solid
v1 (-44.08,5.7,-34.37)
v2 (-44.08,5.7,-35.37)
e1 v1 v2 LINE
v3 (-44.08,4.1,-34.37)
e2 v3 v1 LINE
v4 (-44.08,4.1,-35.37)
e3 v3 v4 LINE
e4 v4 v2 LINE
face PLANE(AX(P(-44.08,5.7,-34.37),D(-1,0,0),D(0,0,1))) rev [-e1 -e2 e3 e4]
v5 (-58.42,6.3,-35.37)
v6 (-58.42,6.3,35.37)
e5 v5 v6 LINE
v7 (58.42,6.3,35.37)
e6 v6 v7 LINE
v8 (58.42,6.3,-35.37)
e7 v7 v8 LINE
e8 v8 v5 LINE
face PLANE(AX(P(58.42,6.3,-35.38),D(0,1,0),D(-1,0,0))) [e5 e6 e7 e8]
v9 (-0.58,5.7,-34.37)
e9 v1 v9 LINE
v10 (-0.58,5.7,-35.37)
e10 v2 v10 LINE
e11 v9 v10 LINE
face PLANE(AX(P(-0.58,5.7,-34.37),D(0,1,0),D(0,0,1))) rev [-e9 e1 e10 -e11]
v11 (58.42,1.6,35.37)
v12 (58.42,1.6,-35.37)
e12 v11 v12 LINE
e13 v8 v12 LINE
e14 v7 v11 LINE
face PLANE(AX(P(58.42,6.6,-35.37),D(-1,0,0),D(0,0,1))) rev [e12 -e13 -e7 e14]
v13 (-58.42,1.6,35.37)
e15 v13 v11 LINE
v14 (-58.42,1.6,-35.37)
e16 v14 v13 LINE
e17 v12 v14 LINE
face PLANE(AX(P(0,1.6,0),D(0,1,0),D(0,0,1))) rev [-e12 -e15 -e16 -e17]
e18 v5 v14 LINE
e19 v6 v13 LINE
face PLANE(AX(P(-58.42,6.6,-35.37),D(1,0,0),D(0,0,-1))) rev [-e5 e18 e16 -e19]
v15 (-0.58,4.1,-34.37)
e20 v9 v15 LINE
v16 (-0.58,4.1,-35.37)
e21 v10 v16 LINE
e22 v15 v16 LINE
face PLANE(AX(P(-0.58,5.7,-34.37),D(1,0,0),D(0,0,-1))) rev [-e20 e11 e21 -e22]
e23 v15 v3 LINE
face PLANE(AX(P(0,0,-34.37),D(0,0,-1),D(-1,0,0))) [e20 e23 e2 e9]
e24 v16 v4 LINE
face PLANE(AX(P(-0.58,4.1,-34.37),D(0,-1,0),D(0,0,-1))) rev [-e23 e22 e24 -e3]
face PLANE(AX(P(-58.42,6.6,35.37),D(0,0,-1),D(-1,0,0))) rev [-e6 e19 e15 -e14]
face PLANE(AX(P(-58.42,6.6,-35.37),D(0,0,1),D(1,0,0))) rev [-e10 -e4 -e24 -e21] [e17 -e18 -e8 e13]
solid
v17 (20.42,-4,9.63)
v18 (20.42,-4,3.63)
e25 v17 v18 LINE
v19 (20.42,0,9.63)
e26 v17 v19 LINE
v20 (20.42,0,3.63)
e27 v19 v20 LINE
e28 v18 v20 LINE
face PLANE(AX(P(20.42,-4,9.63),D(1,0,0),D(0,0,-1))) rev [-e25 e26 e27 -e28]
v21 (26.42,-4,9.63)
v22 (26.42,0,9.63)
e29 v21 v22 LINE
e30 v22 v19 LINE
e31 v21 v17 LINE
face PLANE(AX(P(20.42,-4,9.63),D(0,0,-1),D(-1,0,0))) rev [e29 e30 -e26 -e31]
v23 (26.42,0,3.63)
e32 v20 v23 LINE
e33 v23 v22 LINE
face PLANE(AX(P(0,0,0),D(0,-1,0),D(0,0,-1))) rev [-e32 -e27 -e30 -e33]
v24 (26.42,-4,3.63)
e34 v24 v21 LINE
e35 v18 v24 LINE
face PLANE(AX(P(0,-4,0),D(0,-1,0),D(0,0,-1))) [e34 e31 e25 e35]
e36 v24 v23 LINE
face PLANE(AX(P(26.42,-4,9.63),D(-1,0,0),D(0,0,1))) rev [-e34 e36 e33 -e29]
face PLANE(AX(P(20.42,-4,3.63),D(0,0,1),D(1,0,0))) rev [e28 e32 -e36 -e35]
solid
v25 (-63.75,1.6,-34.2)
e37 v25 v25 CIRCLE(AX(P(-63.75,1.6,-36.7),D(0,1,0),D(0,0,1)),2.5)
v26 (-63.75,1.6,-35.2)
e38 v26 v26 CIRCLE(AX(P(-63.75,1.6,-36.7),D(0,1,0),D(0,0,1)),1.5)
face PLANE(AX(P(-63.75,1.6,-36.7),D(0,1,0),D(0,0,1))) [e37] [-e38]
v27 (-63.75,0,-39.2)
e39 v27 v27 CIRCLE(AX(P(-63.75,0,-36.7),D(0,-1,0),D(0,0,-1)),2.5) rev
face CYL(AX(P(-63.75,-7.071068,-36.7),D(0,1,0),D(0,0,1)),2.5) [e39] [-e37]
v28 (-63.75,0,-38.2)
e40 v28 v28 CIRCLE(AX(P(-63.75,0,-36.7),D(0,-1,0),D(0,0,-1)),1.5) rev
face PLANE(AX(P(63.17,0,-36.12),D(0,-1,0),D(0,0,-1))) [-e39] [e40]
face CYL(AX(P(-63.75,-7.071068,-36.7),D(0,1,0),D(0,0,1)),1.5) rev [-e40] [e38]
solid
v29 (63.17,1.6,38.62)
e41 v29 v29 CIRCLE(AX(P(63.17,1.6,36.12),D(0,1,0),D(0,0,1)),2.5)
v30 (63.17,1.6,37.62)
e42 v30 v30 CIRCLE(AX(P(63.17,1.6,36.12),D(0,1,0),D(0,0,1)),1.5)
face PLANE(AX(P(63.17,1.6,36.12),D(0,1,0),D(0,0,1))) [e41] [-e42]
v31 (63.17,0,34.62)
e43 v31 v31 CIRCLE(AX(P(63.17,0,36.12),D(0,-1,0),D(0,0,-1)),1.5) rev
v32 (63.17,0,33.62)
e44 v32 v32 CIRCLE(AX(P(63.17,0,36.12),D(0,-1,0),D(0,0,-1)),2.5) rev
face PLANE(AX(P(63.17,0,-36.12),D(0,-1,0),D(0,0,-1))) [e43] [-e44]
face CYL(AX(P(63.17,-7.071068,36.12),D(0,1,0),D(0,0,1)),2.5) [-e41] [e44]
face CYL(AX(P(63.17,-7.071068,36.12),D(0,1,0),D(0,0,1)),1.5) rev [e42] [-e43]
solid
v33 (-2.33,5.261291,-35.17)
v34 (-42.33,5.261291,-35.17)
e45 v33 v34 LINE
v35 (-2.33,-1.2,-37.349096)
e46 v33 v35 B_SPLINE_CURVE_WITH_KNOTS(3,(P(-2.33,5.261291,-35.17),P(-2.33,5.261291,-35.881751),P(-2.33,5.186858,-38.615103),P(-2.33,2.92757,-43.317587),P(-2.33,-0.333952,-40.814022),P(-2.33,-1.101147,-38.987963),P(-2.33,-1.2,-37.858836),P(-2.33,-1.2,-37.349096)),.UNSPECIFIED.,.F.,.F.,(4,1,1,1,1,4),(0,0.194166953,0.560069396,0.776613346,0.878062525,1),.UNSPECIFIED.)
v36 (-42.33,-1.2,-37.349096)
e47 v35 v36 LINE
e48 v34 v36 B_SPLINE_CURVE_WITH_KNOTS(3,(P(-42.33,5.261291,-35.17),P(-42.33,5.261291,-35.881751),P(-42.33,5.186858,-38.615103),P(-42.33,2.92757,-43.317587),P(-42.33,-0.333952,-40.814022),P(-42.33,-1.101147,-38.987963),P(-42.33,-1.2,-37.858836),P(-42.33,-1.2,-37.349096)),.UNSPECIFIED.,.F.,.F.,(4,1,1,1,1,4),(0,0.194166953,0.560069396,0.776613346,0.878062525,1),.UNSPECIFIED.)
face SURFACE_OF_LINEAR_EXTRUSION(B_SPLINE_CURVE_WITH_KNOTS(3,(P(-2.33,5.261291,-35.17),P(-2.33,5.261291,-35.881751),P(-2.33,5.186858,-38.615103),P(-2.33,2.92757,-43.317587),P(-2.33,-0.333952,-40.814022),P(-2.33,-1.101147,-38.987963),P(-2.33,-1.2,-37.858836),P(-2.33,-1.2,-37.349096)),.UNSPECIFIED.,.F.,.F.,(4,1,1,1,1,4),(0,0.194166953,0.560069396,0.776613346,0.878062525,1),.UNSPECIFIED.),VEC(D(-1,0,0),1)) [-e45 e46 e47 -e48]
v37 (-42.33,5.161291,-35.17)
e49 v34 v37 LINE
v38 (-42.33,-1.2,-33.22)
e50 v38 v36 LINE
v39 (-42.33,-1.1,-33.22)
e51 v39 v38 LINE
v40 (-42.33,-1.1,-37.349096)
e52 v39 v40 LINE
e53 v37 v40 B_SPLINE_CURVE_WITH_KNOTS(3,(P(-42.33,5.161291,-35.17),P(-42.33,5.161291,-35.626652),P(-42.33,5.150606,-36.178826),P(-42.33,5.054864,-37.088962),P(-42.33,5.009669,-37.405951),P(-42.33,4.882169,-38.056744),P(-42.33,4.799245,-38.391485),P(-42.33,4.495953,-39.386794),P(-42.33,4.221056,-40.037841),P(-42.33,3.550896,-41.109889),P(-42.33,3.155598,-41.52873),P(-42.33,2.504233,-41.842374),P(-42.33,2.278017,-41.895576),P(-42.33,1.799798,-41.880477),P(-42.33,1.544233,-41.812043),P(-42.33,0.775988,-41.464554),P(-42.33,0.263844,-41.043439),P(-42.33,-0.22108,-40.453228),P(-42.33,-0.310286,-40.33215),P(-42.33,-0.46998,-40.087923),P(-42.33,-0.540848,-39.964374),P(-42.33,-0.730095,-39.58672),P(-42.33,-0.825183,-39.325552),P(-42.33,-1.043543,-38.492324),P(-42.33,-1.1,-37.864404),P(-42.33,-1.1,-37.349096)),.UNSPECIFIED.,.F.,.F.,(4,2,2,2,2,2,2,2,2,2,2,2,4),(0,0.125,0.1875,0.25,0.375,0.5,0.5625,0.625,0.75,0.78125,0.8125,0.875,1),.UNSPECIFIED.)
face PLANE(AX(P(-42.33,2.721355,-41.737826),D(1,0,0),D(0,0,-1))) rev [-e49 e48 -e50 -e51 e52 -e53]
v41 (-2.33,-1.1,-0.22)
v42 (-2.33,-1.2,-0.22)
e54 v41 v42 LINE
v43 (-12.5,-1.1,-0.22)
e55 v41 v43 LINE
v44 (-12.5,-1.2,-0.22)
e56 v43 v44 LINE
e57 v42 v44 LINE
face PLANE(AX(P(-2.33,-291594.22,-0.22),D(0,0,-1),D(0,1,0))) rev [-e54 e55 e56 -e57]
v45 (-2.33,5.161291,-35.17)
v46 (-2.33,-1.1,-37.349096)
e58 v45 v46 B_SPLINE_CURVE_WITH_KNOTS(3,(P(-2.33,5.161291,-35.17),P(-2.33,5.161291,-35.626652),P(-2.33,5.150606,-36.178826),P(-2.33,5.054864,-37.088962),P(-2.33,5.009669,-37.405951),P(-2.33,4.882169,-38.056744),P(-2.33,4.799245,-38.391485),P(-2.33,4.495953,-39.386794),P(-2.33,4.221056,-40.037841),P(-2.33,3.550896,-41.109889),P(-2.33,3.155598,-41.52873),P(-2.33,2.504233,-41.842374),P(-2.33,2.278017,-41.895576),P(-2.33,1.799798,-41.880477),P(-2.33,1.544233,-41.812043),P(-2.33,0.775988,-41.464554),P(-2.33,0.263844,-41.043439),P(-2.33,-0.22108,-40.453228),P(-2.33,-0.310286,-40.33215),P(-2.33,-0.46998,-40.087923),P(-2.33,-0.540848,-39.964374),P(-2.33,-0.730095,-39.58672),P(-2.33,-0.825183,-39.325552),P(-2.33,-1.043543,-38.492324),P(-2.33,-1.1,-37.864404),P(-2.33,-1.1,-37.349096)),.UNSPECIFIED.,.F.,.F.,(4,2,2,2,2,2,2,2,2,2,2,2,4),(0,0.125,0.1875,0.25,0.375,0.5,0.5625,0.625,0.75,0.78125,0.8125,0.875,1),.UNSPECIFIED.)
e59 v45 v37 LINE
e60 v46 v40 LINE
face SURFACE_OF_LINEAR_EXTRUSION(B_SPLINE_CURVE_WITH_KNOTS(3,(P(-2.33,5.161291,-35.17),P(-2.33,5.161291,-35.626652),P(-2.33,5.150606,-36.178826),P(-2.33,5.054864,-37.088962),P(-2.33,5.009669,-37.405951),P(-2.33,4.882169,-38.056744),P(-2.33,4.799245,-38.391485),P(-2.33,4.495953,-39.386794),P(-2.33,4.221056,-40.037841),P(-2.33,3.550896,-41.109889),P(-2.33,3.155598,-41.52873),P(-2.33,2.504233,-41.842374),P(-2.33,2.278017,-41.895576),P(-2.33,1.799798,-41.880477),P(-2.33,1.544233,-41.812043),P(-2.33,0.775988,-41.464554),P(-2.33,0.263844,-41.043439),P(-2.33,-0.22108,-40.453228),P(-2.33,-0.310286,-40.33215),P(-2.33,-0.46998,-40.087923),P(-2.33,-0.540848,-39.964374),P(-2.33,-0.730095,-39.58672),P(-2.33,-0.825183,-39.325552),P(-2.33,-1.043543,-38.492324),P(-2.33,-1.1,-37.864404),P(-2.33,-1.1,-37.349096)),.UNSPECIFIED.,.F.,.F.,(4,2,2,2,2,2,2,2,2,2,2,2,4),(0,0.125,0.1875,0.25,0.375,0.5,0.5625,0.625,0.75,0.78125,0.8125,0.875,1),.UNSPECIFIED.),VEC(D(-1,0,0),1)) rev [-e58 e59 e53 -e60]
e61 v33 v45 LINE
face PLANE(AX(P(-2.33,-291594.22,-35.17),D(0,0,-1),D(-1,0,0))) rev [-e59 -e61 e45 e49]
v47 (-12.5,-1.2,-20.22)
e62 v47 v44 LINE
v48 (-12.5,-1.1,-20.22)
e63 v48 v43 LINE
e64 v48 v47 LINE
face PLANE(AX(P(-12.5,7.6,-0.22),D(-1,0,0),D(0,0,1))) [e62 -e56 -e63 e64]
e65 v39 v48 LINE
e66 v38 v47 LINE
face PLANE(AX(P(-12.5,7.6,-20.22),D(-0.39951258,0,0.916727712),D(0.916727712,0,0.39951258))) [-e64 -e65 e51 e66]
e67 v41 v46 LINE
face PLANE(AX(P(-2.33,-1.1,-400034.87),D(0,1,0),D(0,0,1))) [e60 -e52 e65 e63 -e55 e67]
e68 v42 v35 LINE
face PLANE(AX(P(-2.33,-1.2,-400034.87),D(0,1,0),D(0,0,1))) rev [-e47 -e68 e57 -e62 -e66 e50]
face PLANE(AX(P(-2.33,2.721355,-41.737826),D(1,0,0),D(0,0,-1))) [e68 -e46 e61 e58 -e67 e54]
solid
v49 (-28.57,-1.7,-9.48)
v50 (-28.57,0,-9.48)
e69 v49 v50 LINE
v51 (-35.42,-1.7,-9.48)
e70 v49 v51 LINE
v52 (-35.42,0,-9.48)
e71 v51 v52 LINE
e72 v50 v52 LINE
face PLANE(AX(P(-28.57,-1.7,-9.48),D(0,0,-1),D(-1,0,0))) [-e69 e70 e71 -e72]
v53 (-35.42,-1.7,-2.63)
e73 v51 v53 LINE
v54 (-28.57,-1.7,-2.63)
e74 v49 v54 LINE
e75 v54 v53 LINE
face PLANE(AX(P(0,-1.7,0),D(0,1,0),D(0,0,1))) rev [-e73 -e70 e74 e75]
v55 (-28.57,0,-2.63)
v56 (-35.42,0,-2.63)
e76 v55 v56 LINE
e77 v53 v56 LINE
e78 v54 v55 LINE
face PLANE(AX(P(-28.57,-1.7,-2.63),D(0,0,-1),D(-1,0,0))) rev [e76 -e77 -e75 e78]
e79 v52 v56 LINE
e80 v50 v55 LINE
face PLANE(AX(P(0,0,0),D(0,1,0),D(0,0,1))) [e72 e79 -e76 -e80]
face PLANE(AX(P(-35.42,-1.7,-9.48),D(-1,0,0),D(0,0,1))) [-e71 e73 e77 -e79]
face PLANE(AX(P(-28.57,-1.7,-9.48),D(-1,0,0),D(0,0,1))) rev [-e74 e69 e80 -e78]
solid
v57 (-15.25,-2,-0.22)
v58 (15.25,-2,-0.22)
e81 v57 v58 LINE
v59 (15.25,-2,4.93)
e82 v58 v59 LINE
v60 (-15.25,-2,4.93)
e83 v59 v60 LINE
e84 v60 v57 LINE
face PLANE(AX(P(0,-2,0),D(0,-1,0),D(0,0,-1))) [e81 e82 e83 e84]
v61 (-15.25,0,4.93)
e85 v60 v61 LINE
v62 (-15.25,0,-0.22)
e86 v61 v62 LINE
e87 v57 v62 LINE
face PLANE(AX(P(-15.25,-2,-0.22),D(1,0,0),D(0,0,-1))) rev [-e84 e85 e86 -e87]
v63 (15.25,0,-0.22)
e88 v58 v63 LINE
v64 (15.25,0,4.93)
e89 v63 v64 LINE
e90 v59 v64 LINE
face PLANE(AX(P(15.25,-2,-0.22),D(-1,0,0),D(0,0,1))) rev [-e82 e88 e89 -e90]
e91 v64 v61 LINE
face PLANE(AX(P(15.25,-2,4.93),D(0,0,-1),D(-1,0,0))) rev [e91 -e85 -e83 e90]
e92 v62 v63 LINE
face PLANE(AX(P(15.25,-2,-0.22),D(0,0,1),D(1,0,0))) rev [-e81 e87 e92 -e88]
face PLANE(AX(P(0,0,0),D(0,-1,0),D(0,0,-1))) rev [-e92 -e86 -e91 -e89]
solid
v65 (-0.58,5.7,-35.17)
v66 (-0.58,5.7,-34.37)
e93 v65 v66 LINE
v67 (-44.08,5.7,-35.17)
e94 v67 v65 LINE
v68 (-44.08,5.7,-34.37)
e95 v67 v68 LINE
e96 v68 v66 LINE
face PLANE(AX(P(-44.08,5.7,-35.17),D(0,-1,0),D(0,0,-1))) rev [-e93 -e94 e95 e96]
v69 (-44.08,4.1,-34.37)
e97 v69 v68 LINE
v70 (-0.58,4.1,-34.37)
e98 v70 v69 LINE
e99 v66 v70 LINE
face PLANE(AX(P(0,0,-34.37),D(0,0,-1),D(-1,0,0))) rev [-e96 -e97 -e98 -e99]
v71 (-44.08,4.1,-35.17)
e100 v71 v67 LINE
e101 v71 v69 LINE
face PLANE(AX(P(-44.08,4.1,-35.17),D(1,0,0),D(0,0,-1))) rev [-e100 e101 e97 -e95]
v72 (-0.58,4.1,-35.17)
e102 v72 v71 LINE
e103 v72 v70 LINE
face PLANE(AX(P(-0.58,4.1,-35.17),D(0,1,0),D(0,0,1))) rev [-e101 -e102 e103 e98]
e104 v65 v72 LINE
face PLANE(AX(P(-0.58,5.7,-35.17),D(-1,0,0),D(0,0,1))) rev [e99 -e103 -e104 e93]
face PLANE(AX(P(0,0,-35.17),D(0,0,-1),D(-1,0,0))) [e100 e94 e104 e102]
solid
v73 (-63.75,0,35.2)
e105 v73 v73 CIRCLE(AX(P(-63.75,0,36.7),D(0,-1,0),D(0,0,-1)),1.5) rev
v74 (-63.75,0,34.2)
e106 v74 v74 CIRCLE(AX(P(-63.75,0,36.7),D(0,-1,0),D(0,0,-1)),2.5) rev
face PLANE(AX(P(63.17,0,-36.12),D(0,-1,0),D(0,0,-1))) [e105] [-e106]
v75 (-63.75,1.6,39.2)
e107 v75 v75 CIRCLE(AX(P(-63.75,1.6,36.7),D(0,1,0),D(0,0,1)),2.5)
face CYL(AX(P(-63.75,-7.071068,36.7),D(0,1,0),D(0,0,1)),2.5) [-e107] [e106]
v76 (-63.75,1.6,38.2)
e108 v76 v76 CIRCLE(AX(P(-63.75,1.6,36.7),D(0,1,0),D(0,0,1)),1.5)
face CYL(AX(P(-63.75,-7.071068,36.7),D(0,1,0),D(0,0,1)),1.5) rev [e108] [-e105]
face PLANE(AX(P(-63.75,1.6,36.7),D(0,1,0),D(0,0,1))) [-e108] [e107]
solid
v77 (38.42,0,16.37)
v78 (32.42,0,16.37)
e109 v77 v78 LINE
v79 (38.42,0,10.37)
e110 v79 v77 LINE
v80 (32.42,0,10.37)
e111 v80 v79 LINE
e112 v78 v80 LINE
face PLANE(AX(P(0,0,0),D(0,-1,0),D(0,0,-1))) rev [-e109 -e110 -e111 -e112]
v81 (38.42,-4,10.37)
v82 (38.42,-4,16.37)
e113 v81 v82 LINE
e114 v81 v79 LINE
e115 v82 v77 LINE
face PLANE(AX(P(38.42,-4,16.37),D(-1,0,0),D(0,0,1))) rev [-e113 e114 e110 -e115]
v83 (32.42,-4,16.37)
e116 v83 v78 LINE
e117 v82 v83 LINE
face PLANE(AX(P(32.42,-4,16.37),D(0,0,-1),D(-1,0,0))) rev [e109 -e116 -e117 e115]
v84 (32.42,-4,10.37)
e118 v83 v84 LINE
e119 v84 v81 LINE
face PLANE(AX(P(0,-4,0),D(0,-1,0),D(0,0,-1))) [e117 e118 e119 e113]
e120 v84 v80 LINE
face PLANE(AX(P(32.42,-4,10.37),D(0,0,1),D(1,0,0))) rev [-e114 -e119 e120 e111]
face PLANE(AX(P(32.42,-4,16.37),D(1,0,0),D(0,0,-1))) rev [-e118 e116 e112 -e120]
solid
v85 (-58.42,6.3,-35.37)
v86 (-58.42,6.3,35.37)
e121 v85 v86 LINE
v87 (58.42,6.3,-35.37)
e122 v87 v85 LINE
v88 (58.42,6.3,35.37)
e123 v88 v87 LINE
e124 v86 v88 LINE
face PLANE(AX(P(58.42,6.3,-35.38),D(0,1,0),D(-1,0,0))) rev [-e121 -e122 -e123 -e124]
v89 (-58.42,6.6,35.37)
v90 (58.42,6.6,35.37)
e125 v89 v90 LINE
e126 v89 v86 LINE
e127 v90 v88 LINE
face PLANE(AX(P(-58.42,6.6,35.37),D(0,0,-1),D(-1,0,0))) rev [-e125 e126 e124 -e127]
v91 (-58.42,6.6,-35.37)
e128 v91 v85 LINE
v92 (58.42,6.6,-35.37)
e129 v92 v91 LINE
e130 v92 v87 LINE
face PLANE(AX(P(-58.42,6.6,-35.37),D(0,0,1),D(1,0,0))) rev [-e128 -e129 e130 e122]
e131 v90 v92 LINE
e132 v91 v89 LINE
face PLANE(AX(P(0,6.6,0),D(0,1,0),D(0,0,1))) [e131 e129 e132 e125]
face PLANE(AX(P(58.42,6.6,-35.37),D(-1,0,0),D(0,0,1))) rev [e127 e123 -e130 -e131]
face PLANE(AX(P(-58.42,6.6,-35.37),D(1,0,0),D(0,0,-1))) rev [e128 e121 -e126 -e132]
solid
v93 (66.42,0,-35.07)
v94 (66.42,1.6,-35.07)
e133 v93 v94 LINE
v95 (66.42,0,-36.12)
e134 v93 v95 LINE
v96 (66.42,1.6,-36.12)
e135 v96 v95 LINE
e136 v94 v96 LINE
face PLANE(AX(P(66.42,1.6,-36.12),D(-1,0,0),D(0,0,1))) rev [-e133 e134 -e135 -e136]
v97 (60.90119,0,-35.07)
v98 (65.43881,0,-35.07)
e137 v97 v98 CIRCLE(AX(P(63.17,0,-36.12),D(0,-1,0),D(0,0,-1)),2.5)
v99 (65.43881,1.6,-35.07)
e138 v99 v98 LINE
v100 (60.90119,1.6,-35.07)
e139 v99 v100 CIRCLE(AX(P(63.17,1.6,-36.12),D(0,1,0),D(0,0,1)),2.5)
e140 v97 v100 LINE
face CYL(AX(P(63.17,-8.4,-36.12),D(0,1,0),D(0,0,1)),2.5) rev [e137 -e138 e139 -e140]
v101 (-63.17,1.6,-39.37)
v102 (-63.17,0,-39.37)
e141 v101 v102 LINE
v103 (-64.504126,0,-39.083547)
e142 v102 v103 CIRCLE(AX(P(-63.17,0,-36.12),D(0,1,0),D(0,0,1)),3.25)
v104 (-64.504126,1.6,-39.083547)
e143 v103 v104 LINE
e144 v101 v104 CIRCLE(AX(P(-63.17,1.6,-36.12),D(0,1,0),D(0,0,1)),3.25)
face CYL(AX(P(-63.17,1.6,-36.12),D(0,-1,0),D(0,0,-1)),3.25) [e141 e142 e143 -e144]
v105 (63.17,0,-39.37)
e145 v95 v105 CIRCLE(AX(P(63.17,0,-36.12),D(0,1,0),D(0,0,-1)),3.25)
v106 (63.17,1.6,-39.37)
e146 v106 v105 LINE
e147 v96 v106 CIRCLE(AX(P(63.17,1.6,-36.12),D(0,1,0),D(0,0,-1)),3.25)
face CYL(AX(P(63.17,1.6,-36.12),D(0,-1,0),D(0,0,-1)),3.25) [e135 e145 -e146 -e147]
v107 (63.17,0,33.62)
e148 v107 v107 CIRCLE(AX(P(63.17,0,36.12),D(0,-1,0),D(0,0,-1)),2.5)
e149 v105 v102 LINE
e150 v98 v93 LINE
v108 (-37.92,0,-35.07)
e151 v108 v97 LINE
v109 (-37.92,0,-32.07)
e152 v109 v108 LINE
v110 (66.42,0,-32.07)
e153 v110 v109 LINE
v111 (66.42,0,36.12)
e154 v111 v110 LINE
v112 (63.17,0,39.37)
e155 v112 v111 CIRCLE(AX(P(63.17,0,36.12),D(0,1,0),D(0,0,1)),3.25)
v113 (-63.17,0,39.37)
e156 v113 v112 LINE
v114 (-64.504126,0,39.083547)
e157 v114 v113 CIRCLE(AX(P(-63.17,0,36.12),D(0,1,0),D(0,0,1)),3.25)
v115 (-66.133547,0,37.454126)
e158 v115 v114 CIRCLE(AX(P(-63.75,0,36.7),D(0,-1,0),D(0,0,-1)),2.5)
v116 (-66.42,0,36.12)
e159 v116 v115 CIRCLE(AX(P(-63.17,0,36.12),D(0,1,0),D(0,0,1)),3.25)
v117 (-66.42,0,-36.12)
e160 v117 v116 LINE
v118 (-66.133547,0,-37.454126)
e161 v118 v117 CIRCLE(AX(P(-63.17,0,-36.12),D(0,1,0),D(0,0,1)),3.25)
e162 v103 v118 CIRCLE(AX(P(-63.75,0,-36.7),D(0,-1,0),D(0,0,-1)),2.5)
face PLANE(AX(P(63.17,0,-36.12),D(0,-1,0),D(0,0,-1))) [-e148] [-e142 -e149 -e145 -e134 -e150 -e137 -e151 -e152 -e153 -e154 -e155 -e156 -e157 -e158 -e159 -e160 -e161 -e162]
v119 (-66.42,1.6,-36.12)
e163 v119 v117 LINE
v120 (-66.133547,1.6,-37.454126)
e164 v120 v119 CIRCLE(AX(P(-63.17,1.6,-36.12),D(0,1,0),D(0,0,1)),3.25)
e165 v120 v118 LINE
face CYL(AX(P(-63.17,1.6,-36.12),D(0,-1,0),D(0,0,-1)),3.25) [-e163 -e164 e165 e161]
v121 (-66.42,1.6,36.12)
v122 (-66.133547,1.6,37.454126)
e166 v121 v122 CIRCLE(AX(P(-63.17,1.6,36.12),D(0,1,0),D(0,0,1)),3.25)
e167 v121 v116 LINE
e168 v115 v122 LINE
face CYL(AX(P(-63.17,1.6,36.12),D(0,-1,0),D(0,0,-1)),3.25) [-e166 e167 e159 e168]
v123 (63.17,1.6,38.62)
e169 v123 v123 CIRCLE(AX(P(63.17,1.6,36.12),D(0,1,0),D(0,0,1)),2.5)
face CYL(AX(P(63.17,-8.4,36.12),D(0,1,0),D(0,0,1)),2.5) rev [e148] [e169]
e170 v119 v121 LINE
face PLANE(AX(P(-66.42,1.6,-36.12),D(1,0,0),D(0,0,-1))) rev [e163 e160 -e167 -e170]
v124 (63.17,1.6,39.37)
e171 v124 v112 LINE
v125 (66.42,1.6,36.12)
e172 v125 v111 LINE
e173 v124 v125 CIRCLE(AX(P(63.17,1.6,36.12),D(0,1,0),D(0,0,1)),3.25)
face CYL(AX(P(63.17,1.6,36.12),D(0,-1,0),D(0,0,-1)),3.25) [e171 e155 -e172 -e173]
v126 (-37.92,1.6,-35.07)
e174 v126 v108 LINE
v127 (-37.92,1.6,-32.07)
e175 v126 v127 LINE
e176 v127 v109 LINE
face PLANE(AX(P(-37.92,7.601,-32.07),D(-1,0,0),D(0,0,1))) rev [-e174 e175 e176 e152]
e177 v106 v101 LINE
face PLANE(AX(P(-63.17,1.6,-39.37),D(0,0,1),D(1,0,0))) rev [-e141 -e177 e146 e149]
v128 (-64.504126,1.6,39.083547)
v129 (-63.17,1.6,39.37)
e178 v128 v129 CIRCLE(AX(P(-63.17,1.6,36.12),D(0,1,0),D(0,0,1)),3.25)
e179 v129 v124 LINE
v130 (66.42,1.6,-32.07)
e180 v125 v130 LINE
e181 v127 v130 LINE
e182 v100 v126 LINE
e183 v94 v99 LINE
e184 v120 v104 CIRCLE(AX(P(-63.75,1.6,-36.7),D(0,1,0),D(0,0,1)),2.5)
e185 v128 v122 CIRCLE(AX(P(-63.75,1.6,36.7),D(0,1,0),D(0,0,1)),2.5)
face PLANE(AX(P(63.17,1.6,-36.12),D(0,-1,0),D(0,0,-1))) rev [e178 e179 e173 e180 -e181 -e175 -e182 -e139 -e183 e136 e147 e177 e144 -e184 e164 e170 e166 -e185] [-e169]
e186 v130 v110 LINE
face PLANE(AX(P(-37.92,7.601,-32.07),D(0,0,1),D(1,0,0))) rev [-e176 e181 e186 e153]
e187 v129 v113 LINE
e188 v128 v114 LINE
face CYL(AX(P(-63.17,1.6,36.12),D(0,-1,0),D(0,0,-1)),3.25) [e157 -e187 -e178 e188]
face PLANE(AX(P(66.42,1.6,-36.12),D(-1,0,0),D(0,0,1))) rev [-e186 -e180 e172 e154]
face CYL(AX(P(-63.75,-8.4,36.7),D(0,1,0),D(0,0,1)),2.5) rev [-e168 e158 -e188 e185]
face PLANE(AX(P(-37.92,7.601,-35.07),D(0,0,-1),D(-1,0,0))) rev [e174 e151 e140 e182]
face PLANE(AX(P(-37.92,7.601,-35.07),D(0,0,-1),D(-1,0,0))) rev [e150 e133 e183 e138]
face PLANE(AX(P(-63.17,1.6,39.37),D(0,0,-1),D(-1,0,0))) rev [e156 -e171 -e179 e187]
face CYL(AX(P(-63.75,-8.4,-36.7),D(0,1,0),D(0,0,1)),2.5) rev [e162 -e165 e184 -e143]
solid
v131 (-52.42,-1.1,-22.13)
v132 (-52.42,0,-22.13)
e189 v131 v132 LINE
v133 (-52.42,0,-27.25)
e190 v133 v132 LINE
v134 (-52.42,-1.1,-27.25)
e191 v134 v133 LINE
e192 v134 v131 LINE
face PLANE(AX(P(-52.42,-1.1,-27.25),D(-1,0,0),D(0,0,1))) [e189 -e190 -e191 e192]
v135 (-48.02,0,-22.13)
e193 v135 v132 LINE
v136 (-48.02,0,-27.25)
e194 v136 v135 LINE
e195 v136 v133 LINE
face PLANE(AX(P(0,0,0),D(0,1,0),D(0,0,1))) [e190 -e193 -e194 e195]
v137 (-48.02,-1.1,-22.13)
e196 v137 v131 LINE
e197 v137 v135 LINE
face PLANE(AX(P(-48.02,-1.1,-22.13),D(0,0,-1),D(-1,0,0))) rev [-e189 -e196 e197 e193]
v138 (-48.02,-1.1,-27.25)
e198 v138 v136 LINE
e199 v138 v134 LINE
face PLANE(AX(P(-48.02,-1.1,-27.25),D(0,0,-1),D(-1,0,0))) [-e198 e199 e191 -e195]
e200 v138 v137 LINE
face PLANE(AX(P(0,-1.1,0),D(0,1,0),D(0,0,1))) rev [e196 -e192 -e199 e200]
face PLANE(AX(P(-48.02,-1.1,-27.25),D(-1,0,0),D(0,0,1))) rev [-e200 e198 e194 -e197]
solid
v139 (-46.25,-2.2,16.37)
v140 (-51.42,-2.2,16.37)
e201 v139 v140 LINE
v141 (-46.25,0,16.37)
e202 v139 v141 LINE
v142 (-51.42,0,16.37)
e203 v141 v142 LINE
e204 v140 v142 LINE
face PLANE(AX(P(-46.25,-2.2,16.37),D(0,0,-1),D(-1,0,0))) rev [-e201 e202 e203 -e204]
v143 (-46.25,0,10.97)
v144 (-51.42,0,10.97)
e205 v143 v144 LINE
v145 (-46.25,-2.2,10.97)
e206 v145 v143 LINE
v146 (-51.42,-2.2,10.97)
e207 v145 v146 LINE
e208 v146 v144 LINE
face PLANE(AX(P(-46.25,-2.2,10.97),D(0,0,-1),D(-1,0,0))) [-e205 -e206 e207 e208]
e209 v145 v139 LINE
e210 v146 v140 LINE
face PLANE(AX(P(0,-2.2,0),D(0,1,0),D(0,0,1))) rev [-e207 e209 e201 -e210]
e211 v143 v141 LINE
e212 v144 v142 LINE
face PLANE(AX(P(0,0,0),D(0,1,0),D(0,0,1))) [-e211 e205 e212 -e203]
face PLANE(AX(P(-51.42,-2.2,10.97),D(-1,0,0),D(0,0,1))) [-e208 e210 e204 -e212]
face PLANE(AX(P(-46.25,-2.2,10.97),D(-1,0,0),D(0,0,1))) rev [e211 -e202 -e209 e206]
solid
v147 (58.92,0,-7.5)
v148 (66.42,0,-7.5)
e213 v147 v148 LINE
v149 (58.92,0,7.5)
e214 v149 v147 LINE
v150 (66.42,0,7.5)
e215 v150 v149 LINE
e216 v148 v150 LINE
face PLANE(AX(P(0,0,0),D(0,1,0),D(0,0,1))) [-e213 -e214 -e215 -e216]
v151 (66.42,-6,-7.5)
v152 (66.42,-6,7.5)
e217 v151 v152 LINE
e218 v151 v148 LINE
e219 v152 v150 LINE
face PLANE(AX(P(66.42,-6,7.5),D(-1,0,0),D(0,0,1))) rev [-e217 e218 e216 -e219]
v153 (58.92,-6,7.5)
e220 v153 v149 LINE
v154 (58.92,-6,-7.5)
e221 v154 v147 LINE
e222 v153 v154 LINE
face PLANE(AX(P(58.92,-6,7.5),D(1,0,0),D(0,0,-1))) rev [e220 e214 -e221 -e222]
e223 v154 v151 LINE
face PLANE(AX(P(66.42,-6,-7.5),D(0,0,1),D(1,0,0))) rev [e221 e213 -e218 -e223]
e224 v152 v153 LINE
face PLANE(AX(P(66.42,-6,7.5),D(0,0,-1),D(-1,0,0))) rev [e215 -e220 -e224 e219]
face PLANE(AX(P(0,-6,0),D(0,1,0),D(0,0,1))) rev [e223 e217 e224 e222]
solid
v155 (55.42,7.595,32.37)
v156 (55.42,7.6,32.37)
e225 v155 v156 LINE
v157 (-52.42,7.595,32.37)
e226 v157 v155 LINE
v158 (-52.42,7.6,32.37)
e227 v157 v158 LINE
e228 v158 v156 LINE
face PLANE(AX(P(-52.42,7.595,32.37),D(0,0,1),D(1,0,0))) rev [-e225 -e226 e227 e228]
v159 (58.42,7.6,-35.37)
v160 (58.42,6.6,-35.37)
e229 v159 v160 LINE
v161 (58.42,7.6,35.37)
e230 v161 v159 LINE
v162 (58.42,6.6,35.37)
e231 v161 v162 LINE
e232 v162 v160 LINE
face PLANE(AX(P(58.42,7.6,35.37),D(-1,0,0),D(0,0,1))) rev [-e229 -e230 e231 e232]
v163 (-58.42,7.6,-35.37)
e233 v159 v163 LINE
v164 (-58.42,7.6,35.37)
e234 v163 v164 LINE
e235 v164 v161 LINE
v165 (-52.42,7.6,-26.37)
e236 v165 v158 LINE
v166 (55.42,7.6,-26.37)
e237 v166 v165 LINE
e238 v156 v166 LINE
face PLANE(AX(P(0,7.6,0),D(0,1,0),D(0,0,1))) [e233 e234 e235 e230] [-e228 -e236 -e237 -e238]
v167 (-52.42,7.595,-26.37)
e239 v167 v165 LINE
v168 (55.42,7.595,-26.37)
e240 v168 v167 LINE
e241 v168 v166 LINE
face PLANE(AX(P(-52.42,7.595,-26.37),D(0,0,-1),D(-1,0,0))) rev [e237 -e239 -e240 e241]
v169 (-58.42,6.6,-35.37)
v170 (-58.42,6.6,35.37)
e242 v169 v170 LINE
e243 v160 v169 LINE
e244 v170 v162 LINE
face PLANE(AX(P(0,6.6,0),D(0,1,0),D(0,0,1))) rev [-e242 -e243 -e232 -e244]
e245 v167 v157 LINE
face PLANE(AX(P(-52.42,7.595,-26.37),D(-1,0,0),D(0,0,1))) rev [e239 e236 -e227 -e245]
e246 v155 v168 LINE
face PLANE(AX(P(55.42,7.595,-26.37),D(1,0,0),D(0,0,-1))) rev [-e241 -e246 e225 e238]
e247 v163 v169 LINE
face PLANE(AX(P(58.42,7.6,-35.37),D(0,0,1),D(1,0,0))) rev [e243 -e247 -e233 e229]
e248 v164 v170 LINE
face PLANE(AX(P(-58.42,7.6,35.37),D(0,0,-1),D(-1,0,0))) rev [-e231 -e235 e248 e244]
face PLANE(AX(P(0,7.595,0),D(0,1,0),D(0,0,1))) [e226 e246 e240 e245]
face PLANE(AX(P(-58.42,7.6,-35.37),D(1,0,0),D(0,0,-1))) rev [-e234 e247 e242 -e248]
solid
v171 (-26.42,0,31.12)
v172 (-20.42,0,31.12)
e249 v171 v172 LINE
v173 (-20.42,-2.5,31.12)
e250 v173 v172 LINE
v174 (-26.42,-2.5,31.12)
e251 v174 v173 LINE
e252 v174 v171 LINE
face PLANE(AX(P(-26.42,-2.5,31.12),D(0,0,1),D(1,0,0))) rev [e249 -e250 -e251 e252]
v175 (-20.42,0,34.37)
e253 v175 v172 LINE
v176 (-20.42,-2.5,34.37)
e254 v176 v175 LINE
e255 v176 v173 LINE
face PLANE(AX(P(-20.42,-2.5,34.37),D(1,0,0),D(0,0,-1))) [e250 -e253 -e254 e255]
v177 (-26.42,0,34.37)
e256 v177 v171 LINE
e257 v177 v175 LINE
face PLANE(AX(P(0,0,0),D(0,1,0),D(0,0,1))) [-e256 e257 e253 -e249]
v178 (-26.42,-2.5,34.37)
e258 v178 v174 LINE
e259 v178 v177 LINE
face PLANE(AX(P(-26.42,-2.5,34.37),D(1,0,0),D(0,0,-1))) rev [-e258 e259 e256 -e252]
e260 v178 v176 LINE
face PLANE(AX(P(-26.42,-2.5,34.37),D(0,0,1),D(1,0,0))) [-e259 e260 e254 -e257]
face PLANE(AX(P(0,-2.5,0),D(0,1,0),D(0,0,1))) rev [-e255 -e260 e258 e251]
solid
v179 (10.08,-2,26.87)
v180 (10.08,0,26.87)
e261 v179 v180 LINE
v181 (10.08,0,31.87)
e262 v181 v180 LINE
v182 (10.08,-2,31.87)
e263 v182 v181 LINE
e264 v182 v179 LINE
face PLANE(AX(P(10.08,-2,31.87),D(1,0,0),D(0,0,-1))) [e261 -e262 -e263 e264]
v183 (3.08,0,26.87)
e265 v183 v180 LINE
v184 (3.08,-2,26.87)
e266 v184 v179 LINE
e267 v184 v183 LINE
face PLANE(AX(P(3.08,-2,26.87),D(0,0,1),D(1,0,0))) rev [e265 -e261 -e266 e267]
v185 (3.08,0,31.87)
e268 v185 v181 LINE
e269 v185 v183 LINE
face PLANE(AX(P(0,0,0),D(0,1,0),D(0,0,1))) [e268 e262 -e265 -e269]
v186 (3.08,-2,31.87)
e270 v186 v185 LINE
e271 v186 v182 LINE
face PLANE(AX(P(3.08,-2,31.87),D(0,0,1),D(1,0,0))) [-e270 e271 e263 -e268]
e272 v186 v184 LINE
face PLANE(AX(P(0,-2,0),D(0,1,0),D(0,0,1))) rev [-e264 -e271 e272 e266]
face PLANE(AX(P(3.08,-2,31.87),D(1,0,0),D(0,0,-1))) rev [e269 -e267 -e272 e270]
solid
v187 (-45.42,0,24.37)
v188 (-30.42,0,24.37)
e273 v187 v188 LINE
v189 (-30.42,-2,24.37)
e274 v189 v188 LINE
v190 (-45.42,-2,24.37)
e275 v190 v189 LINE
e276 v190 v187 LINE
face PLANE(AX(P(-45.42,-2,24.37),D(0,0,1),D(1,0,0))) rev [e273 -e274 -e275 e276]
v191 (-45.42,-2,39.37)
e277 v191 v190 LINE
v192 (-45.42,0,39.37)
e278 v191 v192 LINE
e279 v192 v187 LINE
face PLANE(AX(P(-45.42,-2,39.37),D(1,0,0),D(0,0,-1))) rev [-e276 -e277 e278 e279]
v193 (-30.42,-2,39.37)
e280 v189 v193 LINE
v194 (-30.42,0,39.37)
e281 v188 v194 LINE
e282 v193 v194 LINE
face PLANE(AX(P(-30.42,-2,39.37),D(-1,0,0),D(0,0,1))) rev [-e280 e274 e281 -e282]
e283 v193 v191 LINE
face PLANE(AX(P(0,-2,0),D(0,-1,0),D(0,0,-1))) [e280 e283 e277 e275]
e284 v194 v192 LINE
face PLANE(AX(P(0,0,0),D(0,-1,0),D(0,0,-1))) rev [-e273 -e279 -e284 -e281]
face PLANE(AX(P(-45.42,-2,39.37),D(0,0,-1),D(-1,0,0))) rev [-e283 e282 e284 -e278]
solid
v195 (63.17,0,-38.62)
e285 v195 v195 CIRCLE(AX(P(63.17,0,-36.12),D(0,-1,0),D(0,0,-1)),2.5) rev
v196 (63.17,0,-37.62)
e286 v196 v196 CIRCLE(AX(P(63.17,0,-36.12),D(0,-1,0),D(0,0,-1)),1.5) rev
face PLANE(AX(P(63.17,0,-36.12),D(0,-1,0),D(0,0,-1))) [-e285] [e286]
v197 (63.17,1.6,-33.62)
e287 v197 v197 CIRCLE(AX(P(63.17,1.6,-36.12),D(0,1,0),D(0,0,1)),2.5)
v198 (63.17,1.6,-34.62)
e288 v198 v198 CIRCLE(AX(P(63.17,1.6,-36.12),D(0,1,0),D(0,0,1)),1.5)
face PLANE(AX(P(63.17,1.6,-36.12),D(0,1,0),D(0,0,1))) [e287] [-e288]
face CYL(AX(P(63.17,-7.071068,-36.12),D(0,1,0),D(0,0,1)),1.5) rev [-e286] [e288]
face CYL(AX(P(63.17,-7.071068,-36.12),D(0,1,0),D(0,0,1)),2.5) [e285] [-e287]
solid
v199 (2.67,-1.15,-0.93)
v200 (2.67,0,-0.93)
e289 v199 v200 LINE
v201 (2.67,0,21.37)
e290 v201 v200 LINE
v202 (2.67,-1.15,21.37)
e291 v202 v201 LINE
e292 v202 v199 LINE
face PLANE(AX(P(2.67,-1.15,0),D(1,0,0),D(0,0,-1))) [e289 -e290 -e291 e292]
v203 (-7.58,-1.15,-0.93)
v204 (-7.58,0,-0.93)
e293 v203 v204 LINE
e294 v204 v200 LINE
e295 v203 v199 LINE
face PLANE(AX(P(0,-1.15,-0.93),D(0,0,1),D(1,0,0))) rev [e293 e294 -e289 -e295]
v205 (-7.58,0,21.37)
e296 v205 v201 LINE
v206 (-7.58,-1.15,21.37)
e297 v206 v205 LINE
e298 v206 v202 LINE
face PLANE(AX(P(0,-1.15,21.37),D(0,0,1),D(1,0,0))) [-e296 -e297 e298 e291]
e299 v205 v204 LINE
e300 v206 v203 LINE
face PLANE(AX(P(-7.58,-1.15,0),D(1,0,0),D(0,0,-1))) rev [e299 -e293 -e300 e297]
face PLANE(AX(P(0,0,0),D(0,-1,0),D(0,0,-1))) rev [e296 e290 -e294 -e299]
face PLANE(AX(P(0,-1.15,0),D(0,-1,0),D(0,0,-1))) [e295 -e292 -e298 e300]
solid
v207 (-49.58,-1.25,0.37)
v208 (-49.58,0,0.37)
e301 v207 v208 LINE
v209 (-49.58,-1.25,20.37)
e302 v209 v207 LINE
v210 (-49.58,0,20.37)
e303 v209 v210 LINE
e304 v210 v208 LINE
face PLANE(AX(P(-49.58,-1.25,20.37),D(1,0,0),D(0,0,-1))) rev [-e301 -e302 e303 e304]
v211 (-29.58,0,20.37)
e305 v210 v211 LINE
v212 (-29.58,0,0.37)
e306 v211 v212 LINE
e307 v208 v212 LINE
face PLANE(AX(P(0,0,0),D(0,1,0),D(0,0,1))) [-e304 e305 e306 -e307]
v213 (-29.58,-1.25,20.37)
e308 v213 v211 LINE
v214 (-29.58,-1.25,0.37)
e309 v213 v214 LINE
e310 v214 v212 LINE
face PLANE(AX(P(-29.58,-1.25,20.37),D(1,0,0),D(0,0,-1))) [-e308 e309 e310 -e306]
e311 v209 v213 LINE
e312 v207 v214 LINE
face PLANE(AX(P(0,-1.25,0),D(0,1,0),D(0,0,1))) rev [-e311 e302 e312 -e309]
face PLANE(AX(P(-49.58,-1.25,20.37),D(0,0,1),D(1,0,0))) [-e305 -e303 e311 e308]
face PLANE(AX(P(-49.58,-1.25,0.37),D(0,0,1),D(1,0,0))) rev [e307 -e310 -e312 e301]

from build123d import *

# Parameters (mm, degrees)
SKETCH1_R                = 1.5
BOSS_EXTRUDE1_DEPTH      = 1.6
SKETCH2_W                = 116.84
SKETCH2_H                = 70.74
BOSS_EXTRUDE2_DEPTH      = 5
SKETCH3_W                = 116.84
SKETCH3_H                = 70.74
BOSS_EXTRUDE3_DEPTH      = 1
SKETCH4_W                = 7.5
SKETCH4_H                = 15
BOSS_EXTRUDE4_DEPTH      = 6
SKETCH5_W                = 15
SKETCH5_H                = 15
BOSS_EXTRUDE5_DEPTH      = 2
SKETCH6_W                = 107.84
SKETCH6_H                = 58.74
CUT_EXTRUDE1_DEPTH       = 0.005
CUT_EXTRUDE14_START      = -10
SKETCH39_R               = 2.5
SKETCH39_R_2             = 1.5
CUT_EXTRUDE14_DEPTH      = 10
SKETCH39_2_R             = 2.5
SKETCH39_2_R_2           = 1.5
BOSS_EXTRUDE18_DEPTH     = 1.6
BOSS_EXTRUDE18_2_DEPTH   = 1.6
BOSS_EXTRUDE18_3_DEPTH   = 1.6
BOSS_EXTRUDE18_4_DEPTH   = 1.6
SKETCH40_W               = 113
SKETCH40_H               = 3
CUT_EXTRUDE15_DEPTH      = 1.6
SPLIT1_SURFACE_1_1_BACK  = 156.021
SPLIT1_SURFACE_1_1_DEPTH = 312.042
SPLIT1_SURFACE_1_2_BACK  = 156.021
SPLIT1_SURFACE_1_2_DEPTH = 312.042
SKETCH43_W               = 20
SKETCH43_H               = 20
BOSS_EXTRUDE19_DEPTH     = 1.25
SKETCH43_3_W             = 10.25
SKETCH43_3_H             = 22.3
BOSS_EXTRUDE20_DEPTH     = 1.15
SKETCH43_5_W             = 6.85
SKETCH43_5_H             = 6.85
BOSS_EXTRUDE21_DEPTH     = 1.7
SKETCH43_6_W             = 5.17
SKETCH43_6_H             = 5.4
BOSS_EXTRUDE22_DEPTH     = 2.2
SKETCH43_7_W             = 4.4
SKETCH43_7_H             = 5.12
BOSS_EXTRUDE23_DEPTH     = 1.1
SKETCH52_W               = 43.5
SKETCH52_H               = 1.6
CUT_EXTRUDE19_DEPTH      = 1
SKETCH54_W               = 43.5
SKETCH54_H               = 1.6
BOSS_EXTRUDE28_DEPTH     = 0.8
SKETCH55_W               = 30.5
SKETCH55_H               = 5.15
BOSS_EXTRUDE29_DEPTH     = 2
EXTRUDE_THIN2_START      = -42.33
EXTRUDE_THIN2_DEPTH      = 40
CUT_EXTRUDE21_DEPTH      = 80.070285044
CUT_EXTRUDE21_DEPTH_BACK = 80.070285044
SKETCH43_9_W             = 7
SKETCH43_9_H             = 5
BOSS_EXTRUDE30_DEPTH     = 2
SKETCH43_10_W            = 6
SKETCH43_10_H            = 3.25
BOSS_EXTRUDE31_DEPTH     = 2.5
SKETCH58_W               = 6
SKETCH58_H               = 6
BOSS_EXTRUDE32_DEPTH     = 4
BOSS_EXTRUDE32_2_DEPTH   = 4


# Read off the part's stored shape, not the designer's step: Extrude-Thin2
with BuildPart() as part:
    # Sketch1 → Boss-Extrude1 (new body)
    with BuildSketch(Plane(origin=(0, 0, 0), x_dir=(1, 0, 0), z_dir=(0, 1, 0))):
        with BuildLine():
            Line((-63.17, 39.37), (63.17, 39.37))
            ThreePointArc((63.17, 39.37), (65.468097039, 38.418097039), (66.42, 36.12))
            Line((66.42, 36.12), (66.42, -36.12))
            ThreePointArc((66.42, -36.12), (65.468097039, -38.418097039), (63.17, -39.37))
            Line((63.17, -39.37), (-63.17, -39.37))
            ThreePointArc((-63.17, -39.37), (-65.468097039, -38.418097039), (-66.42, -36.12))
            Line((-66.42, -36.12), (-66.42, 36.12))
            ThreePointArc((-66.42, 36.12), (-65.468097039, 38.418097039), (-63.17, 39.37))
        make_face()
        with Locations(Location((-63.75, 36.7, 0), (0, 0, 270))):
            Circle(SKETCH1_R, mode=Mode.SUBTRACT)
        with Locations(Location((-63.75, -36.7, 0), (0, 0, 270))):
            Circle(SKETCH1_R, mode=Mode.SUBTRACT)
        with Locations(Location((63.17, -36.12, 0), (0, 0, 270))):
            Circle(SKETCH1_R, mode=Mode.SUBTRACT)
        with Locations(Location((63.17, 36.12, 0), (0, 0, 270))):
            Circle(SKETCH1_R, mode=Mode.SUBTRACT)
    extrude(amount=BOSS_EXTRUDE1_DEPTH)

    # Sketch39 → Cut-Extrude14 (cut)
    # profile 1 of 4: a face of its own
    with BuildSketch(Plane(origin=(0, 1.6, 0), x_dir=(1, 0, 0), z_dir=(0, 1, 0)).offset(CUT_EXTRUDE14_START)):
        with Locations(Location((63.17, -36.12, 0), (0, 0, 270))):
            Circle(SKETCH39_R)
        with Locations((63.17, -36.12)):
            Circle(SKETCH39_R_2, mode=Mode.SUBTRACT)
    # profile 2 of 4: a face of its own
    with BuildSketch(Plane(origin=(0, 1.6, 0), x_dir=(1, 0, 0), z_dir=(0, 1, 0)).offset(CUT_EXTRUDE14_START)):
        with Locations((-63.75, -36.7)):
            Circle(SKETCH39_R)
        with Locations((-63.75, -36.7)):
            Circle(SKETCH39_R_2, mode=Mode.SUBTRACT)
    # profile 3 of 4: a face of its own
    with BuildSketch(Plane(origin=(0, 1.6, 0), x_dir=(1, 0, 0), z_dir=(0, 1, 0)).offset(CUT_EXTRUDE14_START)):
        with Locations(Location((63.17, 36.12, 0), (0, 0, 270))):
            Circle(SKETCH39_R)
        with Locations((63.17, 36.12)):
            Circle(SKETCH39_R_2, mode=Mode.SUBTRACT)
    # profile 4 of 4: a face of its own
    with BuildSketch(Plane(origin=(0, 1.6, 0), x_dir=(1, 0, 0), z_dir=(0, 1, 0)).offset(CUT_EXTRUDE14_START)):
        with Locations((-63.75, 36.7)):
            Circle(SKETCH39_R)
        with Locations((-63.75, 36.7)):
            Circle(SKETCH39_R_2, mode=Mode.SUBTRACT)
    extrude(amount=CUT_EXTRUDE14_DEPTH, mode=Mode.SUBTRACT)

    # Sketch40 → Cut-Extrude15 (cut)
    with BuildSketch(Plane.XZ):
        with Locations((18.58, -33.57)):
            Rectangle(SKETCH40_W, SKETCH40_H)
    extrude(amount=-CUT_EXTRUDE15_DEPTH, mode=Mode.SUBTRACT)


with BuildPart() as body_2:
    # Sketch2 → Boss-Extrude2 (new body)
    with BuildSketch(Plane(origin=(0, 1.6, 0), x_dir=(1, 0, 0), z_dir=(0, 1, 0))):
        Rectangle(SKETCH2_W, SKETCH2_H)
    extrude(amount=BOSS_EXTRUDE2_DEPTH)


with BuildPart() as body_3:
    # Sketch3 → Boss-Extrude3 (new body)
    with BuildSketch(Plane(origin=(0, 6.6, 0), x_dir=(1, 0, 0), z_dir=(0, 1, 0))):
        Rectangle(SKETCH3_W, SKETCH3_H)
    extrude(amount=BOSS_EXTRUDE3_DEPTH)

    # Sketch6 → Cut-Extrude1 (cut)
    with BuildSketch(Plane(origin=(0, 7.6, 0), x_dir=(1, 0, 0), z_dir=(0, 1, 0))):
        with Locations((1.5, -3)):
            Rectangle(SKETCH6_W, SKETCH6_H)
    extrude(amount=-CUT_EXTRUDE1_DEPTH, mode=Mode.SUBTRACT)


with BuildPart() as body_4:
    # Sketch4 → Boss-Extrude4 (new body)
    with BuildSketch(Plane.XZ):
        with Locations((62.67, 0)):
            Rectangle(SKETCH4_W, SKETCH4_H)
    extrude(amount=BOSS_EXTRUDE4_DEPTH)


with BuildPart() as body_5:
    # Sketch5 → Boss-Extrude5 (new body)
    with BuildSketch(Plane.XZ):
        with Locations((-37.92, 31.87)):
            Rectangle(SKETCH5_W, SKETCH5_H)
    extrude(amount=BOSS_EXTRUDE5_DEPTH)


with BuildPart() as body_6:
    # Sketch39<2> → Boss-Extrude18 (new body)
    with BuildSketch(Plane(origin=(0, 1.6, 0), x_dir=(1, 0, 0), z_dir=(0, 1, 0))):
        with Locations(Location((63.17, -36.12, 0), (0, 0, 270))):
            Circle(SKETCH39_2_R)
        with Locations(Location((63.17, -36.12, 0), (0, 0, 270))):
            Circle(SKETCH39_2_R_2, mode=Mode.SUBTRACT)
    extrude(amount=-BOSS_EXTRUDE18_DEPTH)


with BuildPart() as body_7:
    # Sketch39<2> → Boss-Extrude18 2 (new body)
    with BuildSketch(Plane(origin=(0, 1.6, 0), x_dir=(1, 0, 0), z_dir=(0, 1, 0))):
        with Locations(Location((-63.75, -36.7, 0), (0, 0, 270))):
            Circle(SKETCH39_2_R)
        with Locations(Location((-63.75, -36.7, 0), (0, 0, 270))):
            Circle(SKETCH39_2_R_2, mode=Mode.SUBTRACT)
    extrude(amount=-BOSS_EXTRUDE18_2_DEPTH)


with BuildPart() as body_8:
    # Sketch39<2> → Boss-Extrude18 3 (new body)
    with BuildSketch(Plane(origin=(0, 1.6, 0), x_dir=(1, 0, 0), z_dir=(0, 1, 0))):
        with Locations(Location((63.17, 36.12, 0), (0, 0, 270))):
            Circle(SKETCH39_2_R)
        with Locations(Location((63.17, 36.12, 0), (0, 0, 270))):
            Circle(SKETCH39_2_R_2, mode=Mode.SUBTRACT)
    extrude(amount=-BOSS_EXTRUDE18_3_DEPTH)


with BuildPart() as body_9:
    # Sketch39<2> → Boss-Extrude18 4 (new body)
    with BuildSketch(Plane(origin=(0, 1.6, 0), x_dir=(1, 0, 0), z_dir=(0, 1, 0))):
        with Locations(Location((-63.75, 36.7, 0), (0, 0, 270))):
            Circle(SKETCH39_2_R)
        with Locations(Location((-63.75, 36.7, 0), (0, 0, 270))):
            Circle(SKETCH39_2_R_2, mode=Mode.SUBTRACT)
    extrude(amount=-BOSS_EXTRUDE18_4_DEPTH)


with BuildPart() as body_10:
    # Split1: the piece behind the surface
    add(body_2.part)
    # Split1 surface 1: a surface, the sketch's curves swept straight by 312.042 mm
    with BuildLine(Plane.XY.offset(-SPLIT1_SURFACE_1_1_BACK), mode=Mode.PRIVATE) as split1_surface_1_1_path:
        Line((58.42, 6.3), (-58.42, 6.3))
    split1_surface_1_1 = Shell.extrude(split1_surface_1_1_path.wire(), (0 * SPLIT1_SURFACE_1_1_DEPTH, 0 * SPLIT1_SURFACE_1_1_DEPTH, 1 * SPLIT1_SURFACE_1_1_DEPTH))
    split(bisect_by=split1_surface_1_1, keep=Keep.BOTTOM)


with BuildPart() as body_2_1:
    add(body_2.part)

    # Split1: split by a surface, the side it looks to stays
    # Split1 surface 1: a surface, the sketch's curves swept straight by 312.042 mm
    with BuildLine(Plane.XY.offset(-SPLIT1_SURFACE_1_2_BACK), mode=Mode.PRIVATE) as split1_surface_1_2_path:
        Line((58.42, 6.3), (-58.42, 6.3))
    split1_surface_1_2 = Shell.extrude(split1_surface_1_2_path.wire(), (0 * SPLIT1_SURFACE_1_2_DEPTH, 0 * SPLIT1_SURFACE_1_2_DEPTH, 1 * SPLIT1_SURFACE_1_2_DEPTH))
    split(bisect_by=split1_surface_1_2, keep=Keep.TOP)

    # Sketch52 → Cut-Extrude19 (cut)
    with BuildSketch(Plane(origin=(0, 0, -35.37), x_dir=(-1, 0, 0), z_dir=(0, 0, -1))):
        with Locations((22.33, 4.9)):
            Rectangle(SKETCH52_W, SKETCH52_H)
    extrude(amount=-CUT_EXTRUDE19_DEPTH, mode=Mode.SUBTRACT)


with BuildPart() as body_11_2:
    # Sketch43 → Boss-Extrude19 (new body)
    with BuildSketch(Plane.XZ):
        with Locations((-39.58, 10.37)):
            Rectangle(SKETCH43_W, SKETCH43_H)
    extrude(amount=BOSS_EXTRUDE19_DEPTH)


with BuildPart() as body_12:
    # Sketch43<3> → Boss-Extrude20 (new body)
    with BuildSketch(Plane.XZ):
        with Locations((-2.455, 10.22)):
            Rectangle(SKETCH43_3_W, SKETCH43_3_H)
    extrude(amount=BOSS_EXTRUDE20_DEPTH)


with BuildPart() as body_13:
    # Sketch43<5> → Boss-Extrude21 (new body)
    with BuildSketch(Plane.XZ):
        with Locations((-31.995, -6.055)):
            Rectangle(SKETCH43_5_W, SKETCH43_5_H)
    extrude(amount=BOSS_EXTRUDE21_DEPTH)


with BuildPart() as body_14:
    # Sketch43<6> → Boss-Extrude22 (new body)
    with BuildSketch(Plane.XZ):
        with Locations((-48.835, 13.67)):
            Rectangle(SKETCH43_6_W, SKETCH43_6_H)
    extrude(amount=BOSS_EXTRUDE22_DEPTH)


with BuildPart() as body_15:
    # Sketch43<7> → Boss-Extrude23 (new body)
    with BuildSketch(Plane.XZ):
        with Locations((-50.22, -24.69)):
            Rectangle(SKETCH43_7_W, SKETCH43_7_H)
    extrude(amount=BOSS_EXTRUDE23_DEPTH)


with BuildPart() as body_16:
    # Sketch54 → Boss-Extrude28 (new body)
    with BuildSketch(Plane(origin=(0, 0, -34.37), x_dir=(-1, 0, 0), z_dir=(0, 0, -1))):
        with Locations((22.33, 4.9)):
            Rectangle(SKETCH54_W, SKETCH54_H)
    extrude(amount=BOSS_EXTRUDE28_DEPTH)


with BuildPart() as body_17:
    # Sketch55 → Boss-Extrude29 (new body)
    with BuildSketch(Plane.XZ):
        with Locations((0, 2.355)):
            Rectangle(SKETCH55_W, SKETCH55_H)
    extrude(amount=BOSS_EXTRUDE29_DEPTH)


with BuildPart() as body_18:
    # Extrude-Thin2 outline → Extrude-Thin2 (new body)
    with BuildSketch(Plane(origin=(0, 0, 0), x_dir=(0, 0, -1), z_dir=(1, 0, 0)).offset(EXTRUDE_THIN2_START)):
        with BuildLine():
            Line((35.17, 5.261290846), (35.17, 5.161290846))
            add(Edge.make_bspline(
                [(35.17, 5.161290846), (35.626651814, 5.161290846), (36.178826319, 5.150606221), (37.088961556, 5.054864485), (37.405950632, 5.009669361), (38.056744399, 4.882169028), (38.391485376, 4.799245446), (39.386793624, 4.495952989), (40.037841142, 4.221056316), (41.109889237, 3.550895619), (41.528729594, 3.155598196), (41.84237371, 2.504232708), (41.89557611, 2.27801708), (41.880476896, 1.799797607), (41.812042886, 1.544233097), (41.464554394, 0.775988086), (41.043439085, 0.263843837), (40.453227691, -0.221080419), (40.33214952, -0.310285856), (40.087923435, -0.469979739), (39.964374463, -0.54084782), (39.586719752, -0.73009498), (39.325551535, -0.825182517), (38.492323962, -1.043543208), (37.864404223, -1.1), (37.349096065, -1.1)],
                knots=[0, 0, 0, 0, 0.125, 0.125, 0.1875, 0.1875, 0.25, 0.25, 0.375, 0.375, 0.5, 0.5, 0.5625, 0.5625, 0.625, 0.625, 0.75, 0.75, 0.78125, 0.78125, 0.8125, 0.8125, 0.875, 0.875, 1, 1, 1, 1], degree=3))
            Line((37.349096065, -1.1), (0.22, -1.1))
            Line((0.22, -1.1), (0.219999995, -1.2))
            Line((0.219999995, -1.2), (37.349096065, -1.2))
            add(Edge.make_bspline(
                [(35.17, 5.261290846), (35.881750528, 5.261290846), (38.615102871, 5.186858466), (43.317587332, 2.927570212), (40.814022251, -0.333951619), (38.987963428, -1.101147323), (37.858836202, -1.2), (37.349096065, -1.2)],
                knots=[0, 0, 0, 0, 0.194166953, 0.560069396, 0.776613346, 0.878062525, 1, 1, 1, 1], degree=3))
        make_face()
    extrude(amount=EXTRUDE_THIN2_DEPTH)

    # Sketch57 → Cut-Extrude21 (cut, two sides: drawn at the far end of the back side and taken through both)
    with BuildSketch(Plane.XZ.offset(1.2).offset(-CUT_EXTRUDE21_DEPTH_BACK)):
        Polygon((-2.33, -16.22), (12.5, -9.22), (12.5, -0.22), (-2.33, -0.22), align=None)
        Polygon((-12.5, -0.22), (-12.5, -20.22), (-42.33, -33.22), (-42.33, -0.22), align=None)
    extrude(amount=CUT_EXTRUDE21_DEPTH + CUT_EXTRUDE21_DEPTH_BACK, mode=Mode.SUBTRACT)


with BuildPart() as body_19:
    # Sketch43<9> → Boss-Extrude30 (new body)
    with BuildSketch(Plane.XZ):
        with Locations((6.58, 29.37)):
            Rectangle(SKETCH43_9_W, SKETCH43_9_H)
    extrude(amount=BOSS_EXTRUDE30_DEPTH)


with BuildPart() as body_20:
    # Sketch43<10> → Boss-Extrude31 (new body)
    with BuildSketch(Plane.XZ):
        with Locations((-23.42, 32.745)):
            Rectangle(SKETCH43_10_W, SKETCH43_10_H)
    extrude(amount=BOSS_EXTRUDE31_DEPTH)


with BuildPart() as body_21:
    # Sketch58 → Boss-Extrude32 (new body)
    with BuildSketch(Plane.XZ):
        with Locations((35.42, 13.37)):
            Rectangle(SKETCH58_W, SKETCH58_H)
    extrude(amount=BOSS_EXTRUDE32_DEPTH)


with BuildPart() as body_22:
    # Sketch58 → Boss-Extrude32 2 (new body)
    with BuildSketch(Plane.XZ):
        with Locations((23.42, 6.63)):
            Rectangle(SKETCH58_W, SKETCH58_H)
    extrude(amount=BOSS_EXTRUDE32_2_DEPTH)


solid = Compound([part.part, body_3.part, body_4.part, body_5.part, body_6.part, body_7.part, body_8.part, body_9.part, body_10.part, body_2_1.part, body_11_2.part, body_12.part, body_13.part, body_14.part, body_15.part, body_16.part, body_17.part, body_18.part, body_19.part, body_20.part, body_21.part, body_22.part])
